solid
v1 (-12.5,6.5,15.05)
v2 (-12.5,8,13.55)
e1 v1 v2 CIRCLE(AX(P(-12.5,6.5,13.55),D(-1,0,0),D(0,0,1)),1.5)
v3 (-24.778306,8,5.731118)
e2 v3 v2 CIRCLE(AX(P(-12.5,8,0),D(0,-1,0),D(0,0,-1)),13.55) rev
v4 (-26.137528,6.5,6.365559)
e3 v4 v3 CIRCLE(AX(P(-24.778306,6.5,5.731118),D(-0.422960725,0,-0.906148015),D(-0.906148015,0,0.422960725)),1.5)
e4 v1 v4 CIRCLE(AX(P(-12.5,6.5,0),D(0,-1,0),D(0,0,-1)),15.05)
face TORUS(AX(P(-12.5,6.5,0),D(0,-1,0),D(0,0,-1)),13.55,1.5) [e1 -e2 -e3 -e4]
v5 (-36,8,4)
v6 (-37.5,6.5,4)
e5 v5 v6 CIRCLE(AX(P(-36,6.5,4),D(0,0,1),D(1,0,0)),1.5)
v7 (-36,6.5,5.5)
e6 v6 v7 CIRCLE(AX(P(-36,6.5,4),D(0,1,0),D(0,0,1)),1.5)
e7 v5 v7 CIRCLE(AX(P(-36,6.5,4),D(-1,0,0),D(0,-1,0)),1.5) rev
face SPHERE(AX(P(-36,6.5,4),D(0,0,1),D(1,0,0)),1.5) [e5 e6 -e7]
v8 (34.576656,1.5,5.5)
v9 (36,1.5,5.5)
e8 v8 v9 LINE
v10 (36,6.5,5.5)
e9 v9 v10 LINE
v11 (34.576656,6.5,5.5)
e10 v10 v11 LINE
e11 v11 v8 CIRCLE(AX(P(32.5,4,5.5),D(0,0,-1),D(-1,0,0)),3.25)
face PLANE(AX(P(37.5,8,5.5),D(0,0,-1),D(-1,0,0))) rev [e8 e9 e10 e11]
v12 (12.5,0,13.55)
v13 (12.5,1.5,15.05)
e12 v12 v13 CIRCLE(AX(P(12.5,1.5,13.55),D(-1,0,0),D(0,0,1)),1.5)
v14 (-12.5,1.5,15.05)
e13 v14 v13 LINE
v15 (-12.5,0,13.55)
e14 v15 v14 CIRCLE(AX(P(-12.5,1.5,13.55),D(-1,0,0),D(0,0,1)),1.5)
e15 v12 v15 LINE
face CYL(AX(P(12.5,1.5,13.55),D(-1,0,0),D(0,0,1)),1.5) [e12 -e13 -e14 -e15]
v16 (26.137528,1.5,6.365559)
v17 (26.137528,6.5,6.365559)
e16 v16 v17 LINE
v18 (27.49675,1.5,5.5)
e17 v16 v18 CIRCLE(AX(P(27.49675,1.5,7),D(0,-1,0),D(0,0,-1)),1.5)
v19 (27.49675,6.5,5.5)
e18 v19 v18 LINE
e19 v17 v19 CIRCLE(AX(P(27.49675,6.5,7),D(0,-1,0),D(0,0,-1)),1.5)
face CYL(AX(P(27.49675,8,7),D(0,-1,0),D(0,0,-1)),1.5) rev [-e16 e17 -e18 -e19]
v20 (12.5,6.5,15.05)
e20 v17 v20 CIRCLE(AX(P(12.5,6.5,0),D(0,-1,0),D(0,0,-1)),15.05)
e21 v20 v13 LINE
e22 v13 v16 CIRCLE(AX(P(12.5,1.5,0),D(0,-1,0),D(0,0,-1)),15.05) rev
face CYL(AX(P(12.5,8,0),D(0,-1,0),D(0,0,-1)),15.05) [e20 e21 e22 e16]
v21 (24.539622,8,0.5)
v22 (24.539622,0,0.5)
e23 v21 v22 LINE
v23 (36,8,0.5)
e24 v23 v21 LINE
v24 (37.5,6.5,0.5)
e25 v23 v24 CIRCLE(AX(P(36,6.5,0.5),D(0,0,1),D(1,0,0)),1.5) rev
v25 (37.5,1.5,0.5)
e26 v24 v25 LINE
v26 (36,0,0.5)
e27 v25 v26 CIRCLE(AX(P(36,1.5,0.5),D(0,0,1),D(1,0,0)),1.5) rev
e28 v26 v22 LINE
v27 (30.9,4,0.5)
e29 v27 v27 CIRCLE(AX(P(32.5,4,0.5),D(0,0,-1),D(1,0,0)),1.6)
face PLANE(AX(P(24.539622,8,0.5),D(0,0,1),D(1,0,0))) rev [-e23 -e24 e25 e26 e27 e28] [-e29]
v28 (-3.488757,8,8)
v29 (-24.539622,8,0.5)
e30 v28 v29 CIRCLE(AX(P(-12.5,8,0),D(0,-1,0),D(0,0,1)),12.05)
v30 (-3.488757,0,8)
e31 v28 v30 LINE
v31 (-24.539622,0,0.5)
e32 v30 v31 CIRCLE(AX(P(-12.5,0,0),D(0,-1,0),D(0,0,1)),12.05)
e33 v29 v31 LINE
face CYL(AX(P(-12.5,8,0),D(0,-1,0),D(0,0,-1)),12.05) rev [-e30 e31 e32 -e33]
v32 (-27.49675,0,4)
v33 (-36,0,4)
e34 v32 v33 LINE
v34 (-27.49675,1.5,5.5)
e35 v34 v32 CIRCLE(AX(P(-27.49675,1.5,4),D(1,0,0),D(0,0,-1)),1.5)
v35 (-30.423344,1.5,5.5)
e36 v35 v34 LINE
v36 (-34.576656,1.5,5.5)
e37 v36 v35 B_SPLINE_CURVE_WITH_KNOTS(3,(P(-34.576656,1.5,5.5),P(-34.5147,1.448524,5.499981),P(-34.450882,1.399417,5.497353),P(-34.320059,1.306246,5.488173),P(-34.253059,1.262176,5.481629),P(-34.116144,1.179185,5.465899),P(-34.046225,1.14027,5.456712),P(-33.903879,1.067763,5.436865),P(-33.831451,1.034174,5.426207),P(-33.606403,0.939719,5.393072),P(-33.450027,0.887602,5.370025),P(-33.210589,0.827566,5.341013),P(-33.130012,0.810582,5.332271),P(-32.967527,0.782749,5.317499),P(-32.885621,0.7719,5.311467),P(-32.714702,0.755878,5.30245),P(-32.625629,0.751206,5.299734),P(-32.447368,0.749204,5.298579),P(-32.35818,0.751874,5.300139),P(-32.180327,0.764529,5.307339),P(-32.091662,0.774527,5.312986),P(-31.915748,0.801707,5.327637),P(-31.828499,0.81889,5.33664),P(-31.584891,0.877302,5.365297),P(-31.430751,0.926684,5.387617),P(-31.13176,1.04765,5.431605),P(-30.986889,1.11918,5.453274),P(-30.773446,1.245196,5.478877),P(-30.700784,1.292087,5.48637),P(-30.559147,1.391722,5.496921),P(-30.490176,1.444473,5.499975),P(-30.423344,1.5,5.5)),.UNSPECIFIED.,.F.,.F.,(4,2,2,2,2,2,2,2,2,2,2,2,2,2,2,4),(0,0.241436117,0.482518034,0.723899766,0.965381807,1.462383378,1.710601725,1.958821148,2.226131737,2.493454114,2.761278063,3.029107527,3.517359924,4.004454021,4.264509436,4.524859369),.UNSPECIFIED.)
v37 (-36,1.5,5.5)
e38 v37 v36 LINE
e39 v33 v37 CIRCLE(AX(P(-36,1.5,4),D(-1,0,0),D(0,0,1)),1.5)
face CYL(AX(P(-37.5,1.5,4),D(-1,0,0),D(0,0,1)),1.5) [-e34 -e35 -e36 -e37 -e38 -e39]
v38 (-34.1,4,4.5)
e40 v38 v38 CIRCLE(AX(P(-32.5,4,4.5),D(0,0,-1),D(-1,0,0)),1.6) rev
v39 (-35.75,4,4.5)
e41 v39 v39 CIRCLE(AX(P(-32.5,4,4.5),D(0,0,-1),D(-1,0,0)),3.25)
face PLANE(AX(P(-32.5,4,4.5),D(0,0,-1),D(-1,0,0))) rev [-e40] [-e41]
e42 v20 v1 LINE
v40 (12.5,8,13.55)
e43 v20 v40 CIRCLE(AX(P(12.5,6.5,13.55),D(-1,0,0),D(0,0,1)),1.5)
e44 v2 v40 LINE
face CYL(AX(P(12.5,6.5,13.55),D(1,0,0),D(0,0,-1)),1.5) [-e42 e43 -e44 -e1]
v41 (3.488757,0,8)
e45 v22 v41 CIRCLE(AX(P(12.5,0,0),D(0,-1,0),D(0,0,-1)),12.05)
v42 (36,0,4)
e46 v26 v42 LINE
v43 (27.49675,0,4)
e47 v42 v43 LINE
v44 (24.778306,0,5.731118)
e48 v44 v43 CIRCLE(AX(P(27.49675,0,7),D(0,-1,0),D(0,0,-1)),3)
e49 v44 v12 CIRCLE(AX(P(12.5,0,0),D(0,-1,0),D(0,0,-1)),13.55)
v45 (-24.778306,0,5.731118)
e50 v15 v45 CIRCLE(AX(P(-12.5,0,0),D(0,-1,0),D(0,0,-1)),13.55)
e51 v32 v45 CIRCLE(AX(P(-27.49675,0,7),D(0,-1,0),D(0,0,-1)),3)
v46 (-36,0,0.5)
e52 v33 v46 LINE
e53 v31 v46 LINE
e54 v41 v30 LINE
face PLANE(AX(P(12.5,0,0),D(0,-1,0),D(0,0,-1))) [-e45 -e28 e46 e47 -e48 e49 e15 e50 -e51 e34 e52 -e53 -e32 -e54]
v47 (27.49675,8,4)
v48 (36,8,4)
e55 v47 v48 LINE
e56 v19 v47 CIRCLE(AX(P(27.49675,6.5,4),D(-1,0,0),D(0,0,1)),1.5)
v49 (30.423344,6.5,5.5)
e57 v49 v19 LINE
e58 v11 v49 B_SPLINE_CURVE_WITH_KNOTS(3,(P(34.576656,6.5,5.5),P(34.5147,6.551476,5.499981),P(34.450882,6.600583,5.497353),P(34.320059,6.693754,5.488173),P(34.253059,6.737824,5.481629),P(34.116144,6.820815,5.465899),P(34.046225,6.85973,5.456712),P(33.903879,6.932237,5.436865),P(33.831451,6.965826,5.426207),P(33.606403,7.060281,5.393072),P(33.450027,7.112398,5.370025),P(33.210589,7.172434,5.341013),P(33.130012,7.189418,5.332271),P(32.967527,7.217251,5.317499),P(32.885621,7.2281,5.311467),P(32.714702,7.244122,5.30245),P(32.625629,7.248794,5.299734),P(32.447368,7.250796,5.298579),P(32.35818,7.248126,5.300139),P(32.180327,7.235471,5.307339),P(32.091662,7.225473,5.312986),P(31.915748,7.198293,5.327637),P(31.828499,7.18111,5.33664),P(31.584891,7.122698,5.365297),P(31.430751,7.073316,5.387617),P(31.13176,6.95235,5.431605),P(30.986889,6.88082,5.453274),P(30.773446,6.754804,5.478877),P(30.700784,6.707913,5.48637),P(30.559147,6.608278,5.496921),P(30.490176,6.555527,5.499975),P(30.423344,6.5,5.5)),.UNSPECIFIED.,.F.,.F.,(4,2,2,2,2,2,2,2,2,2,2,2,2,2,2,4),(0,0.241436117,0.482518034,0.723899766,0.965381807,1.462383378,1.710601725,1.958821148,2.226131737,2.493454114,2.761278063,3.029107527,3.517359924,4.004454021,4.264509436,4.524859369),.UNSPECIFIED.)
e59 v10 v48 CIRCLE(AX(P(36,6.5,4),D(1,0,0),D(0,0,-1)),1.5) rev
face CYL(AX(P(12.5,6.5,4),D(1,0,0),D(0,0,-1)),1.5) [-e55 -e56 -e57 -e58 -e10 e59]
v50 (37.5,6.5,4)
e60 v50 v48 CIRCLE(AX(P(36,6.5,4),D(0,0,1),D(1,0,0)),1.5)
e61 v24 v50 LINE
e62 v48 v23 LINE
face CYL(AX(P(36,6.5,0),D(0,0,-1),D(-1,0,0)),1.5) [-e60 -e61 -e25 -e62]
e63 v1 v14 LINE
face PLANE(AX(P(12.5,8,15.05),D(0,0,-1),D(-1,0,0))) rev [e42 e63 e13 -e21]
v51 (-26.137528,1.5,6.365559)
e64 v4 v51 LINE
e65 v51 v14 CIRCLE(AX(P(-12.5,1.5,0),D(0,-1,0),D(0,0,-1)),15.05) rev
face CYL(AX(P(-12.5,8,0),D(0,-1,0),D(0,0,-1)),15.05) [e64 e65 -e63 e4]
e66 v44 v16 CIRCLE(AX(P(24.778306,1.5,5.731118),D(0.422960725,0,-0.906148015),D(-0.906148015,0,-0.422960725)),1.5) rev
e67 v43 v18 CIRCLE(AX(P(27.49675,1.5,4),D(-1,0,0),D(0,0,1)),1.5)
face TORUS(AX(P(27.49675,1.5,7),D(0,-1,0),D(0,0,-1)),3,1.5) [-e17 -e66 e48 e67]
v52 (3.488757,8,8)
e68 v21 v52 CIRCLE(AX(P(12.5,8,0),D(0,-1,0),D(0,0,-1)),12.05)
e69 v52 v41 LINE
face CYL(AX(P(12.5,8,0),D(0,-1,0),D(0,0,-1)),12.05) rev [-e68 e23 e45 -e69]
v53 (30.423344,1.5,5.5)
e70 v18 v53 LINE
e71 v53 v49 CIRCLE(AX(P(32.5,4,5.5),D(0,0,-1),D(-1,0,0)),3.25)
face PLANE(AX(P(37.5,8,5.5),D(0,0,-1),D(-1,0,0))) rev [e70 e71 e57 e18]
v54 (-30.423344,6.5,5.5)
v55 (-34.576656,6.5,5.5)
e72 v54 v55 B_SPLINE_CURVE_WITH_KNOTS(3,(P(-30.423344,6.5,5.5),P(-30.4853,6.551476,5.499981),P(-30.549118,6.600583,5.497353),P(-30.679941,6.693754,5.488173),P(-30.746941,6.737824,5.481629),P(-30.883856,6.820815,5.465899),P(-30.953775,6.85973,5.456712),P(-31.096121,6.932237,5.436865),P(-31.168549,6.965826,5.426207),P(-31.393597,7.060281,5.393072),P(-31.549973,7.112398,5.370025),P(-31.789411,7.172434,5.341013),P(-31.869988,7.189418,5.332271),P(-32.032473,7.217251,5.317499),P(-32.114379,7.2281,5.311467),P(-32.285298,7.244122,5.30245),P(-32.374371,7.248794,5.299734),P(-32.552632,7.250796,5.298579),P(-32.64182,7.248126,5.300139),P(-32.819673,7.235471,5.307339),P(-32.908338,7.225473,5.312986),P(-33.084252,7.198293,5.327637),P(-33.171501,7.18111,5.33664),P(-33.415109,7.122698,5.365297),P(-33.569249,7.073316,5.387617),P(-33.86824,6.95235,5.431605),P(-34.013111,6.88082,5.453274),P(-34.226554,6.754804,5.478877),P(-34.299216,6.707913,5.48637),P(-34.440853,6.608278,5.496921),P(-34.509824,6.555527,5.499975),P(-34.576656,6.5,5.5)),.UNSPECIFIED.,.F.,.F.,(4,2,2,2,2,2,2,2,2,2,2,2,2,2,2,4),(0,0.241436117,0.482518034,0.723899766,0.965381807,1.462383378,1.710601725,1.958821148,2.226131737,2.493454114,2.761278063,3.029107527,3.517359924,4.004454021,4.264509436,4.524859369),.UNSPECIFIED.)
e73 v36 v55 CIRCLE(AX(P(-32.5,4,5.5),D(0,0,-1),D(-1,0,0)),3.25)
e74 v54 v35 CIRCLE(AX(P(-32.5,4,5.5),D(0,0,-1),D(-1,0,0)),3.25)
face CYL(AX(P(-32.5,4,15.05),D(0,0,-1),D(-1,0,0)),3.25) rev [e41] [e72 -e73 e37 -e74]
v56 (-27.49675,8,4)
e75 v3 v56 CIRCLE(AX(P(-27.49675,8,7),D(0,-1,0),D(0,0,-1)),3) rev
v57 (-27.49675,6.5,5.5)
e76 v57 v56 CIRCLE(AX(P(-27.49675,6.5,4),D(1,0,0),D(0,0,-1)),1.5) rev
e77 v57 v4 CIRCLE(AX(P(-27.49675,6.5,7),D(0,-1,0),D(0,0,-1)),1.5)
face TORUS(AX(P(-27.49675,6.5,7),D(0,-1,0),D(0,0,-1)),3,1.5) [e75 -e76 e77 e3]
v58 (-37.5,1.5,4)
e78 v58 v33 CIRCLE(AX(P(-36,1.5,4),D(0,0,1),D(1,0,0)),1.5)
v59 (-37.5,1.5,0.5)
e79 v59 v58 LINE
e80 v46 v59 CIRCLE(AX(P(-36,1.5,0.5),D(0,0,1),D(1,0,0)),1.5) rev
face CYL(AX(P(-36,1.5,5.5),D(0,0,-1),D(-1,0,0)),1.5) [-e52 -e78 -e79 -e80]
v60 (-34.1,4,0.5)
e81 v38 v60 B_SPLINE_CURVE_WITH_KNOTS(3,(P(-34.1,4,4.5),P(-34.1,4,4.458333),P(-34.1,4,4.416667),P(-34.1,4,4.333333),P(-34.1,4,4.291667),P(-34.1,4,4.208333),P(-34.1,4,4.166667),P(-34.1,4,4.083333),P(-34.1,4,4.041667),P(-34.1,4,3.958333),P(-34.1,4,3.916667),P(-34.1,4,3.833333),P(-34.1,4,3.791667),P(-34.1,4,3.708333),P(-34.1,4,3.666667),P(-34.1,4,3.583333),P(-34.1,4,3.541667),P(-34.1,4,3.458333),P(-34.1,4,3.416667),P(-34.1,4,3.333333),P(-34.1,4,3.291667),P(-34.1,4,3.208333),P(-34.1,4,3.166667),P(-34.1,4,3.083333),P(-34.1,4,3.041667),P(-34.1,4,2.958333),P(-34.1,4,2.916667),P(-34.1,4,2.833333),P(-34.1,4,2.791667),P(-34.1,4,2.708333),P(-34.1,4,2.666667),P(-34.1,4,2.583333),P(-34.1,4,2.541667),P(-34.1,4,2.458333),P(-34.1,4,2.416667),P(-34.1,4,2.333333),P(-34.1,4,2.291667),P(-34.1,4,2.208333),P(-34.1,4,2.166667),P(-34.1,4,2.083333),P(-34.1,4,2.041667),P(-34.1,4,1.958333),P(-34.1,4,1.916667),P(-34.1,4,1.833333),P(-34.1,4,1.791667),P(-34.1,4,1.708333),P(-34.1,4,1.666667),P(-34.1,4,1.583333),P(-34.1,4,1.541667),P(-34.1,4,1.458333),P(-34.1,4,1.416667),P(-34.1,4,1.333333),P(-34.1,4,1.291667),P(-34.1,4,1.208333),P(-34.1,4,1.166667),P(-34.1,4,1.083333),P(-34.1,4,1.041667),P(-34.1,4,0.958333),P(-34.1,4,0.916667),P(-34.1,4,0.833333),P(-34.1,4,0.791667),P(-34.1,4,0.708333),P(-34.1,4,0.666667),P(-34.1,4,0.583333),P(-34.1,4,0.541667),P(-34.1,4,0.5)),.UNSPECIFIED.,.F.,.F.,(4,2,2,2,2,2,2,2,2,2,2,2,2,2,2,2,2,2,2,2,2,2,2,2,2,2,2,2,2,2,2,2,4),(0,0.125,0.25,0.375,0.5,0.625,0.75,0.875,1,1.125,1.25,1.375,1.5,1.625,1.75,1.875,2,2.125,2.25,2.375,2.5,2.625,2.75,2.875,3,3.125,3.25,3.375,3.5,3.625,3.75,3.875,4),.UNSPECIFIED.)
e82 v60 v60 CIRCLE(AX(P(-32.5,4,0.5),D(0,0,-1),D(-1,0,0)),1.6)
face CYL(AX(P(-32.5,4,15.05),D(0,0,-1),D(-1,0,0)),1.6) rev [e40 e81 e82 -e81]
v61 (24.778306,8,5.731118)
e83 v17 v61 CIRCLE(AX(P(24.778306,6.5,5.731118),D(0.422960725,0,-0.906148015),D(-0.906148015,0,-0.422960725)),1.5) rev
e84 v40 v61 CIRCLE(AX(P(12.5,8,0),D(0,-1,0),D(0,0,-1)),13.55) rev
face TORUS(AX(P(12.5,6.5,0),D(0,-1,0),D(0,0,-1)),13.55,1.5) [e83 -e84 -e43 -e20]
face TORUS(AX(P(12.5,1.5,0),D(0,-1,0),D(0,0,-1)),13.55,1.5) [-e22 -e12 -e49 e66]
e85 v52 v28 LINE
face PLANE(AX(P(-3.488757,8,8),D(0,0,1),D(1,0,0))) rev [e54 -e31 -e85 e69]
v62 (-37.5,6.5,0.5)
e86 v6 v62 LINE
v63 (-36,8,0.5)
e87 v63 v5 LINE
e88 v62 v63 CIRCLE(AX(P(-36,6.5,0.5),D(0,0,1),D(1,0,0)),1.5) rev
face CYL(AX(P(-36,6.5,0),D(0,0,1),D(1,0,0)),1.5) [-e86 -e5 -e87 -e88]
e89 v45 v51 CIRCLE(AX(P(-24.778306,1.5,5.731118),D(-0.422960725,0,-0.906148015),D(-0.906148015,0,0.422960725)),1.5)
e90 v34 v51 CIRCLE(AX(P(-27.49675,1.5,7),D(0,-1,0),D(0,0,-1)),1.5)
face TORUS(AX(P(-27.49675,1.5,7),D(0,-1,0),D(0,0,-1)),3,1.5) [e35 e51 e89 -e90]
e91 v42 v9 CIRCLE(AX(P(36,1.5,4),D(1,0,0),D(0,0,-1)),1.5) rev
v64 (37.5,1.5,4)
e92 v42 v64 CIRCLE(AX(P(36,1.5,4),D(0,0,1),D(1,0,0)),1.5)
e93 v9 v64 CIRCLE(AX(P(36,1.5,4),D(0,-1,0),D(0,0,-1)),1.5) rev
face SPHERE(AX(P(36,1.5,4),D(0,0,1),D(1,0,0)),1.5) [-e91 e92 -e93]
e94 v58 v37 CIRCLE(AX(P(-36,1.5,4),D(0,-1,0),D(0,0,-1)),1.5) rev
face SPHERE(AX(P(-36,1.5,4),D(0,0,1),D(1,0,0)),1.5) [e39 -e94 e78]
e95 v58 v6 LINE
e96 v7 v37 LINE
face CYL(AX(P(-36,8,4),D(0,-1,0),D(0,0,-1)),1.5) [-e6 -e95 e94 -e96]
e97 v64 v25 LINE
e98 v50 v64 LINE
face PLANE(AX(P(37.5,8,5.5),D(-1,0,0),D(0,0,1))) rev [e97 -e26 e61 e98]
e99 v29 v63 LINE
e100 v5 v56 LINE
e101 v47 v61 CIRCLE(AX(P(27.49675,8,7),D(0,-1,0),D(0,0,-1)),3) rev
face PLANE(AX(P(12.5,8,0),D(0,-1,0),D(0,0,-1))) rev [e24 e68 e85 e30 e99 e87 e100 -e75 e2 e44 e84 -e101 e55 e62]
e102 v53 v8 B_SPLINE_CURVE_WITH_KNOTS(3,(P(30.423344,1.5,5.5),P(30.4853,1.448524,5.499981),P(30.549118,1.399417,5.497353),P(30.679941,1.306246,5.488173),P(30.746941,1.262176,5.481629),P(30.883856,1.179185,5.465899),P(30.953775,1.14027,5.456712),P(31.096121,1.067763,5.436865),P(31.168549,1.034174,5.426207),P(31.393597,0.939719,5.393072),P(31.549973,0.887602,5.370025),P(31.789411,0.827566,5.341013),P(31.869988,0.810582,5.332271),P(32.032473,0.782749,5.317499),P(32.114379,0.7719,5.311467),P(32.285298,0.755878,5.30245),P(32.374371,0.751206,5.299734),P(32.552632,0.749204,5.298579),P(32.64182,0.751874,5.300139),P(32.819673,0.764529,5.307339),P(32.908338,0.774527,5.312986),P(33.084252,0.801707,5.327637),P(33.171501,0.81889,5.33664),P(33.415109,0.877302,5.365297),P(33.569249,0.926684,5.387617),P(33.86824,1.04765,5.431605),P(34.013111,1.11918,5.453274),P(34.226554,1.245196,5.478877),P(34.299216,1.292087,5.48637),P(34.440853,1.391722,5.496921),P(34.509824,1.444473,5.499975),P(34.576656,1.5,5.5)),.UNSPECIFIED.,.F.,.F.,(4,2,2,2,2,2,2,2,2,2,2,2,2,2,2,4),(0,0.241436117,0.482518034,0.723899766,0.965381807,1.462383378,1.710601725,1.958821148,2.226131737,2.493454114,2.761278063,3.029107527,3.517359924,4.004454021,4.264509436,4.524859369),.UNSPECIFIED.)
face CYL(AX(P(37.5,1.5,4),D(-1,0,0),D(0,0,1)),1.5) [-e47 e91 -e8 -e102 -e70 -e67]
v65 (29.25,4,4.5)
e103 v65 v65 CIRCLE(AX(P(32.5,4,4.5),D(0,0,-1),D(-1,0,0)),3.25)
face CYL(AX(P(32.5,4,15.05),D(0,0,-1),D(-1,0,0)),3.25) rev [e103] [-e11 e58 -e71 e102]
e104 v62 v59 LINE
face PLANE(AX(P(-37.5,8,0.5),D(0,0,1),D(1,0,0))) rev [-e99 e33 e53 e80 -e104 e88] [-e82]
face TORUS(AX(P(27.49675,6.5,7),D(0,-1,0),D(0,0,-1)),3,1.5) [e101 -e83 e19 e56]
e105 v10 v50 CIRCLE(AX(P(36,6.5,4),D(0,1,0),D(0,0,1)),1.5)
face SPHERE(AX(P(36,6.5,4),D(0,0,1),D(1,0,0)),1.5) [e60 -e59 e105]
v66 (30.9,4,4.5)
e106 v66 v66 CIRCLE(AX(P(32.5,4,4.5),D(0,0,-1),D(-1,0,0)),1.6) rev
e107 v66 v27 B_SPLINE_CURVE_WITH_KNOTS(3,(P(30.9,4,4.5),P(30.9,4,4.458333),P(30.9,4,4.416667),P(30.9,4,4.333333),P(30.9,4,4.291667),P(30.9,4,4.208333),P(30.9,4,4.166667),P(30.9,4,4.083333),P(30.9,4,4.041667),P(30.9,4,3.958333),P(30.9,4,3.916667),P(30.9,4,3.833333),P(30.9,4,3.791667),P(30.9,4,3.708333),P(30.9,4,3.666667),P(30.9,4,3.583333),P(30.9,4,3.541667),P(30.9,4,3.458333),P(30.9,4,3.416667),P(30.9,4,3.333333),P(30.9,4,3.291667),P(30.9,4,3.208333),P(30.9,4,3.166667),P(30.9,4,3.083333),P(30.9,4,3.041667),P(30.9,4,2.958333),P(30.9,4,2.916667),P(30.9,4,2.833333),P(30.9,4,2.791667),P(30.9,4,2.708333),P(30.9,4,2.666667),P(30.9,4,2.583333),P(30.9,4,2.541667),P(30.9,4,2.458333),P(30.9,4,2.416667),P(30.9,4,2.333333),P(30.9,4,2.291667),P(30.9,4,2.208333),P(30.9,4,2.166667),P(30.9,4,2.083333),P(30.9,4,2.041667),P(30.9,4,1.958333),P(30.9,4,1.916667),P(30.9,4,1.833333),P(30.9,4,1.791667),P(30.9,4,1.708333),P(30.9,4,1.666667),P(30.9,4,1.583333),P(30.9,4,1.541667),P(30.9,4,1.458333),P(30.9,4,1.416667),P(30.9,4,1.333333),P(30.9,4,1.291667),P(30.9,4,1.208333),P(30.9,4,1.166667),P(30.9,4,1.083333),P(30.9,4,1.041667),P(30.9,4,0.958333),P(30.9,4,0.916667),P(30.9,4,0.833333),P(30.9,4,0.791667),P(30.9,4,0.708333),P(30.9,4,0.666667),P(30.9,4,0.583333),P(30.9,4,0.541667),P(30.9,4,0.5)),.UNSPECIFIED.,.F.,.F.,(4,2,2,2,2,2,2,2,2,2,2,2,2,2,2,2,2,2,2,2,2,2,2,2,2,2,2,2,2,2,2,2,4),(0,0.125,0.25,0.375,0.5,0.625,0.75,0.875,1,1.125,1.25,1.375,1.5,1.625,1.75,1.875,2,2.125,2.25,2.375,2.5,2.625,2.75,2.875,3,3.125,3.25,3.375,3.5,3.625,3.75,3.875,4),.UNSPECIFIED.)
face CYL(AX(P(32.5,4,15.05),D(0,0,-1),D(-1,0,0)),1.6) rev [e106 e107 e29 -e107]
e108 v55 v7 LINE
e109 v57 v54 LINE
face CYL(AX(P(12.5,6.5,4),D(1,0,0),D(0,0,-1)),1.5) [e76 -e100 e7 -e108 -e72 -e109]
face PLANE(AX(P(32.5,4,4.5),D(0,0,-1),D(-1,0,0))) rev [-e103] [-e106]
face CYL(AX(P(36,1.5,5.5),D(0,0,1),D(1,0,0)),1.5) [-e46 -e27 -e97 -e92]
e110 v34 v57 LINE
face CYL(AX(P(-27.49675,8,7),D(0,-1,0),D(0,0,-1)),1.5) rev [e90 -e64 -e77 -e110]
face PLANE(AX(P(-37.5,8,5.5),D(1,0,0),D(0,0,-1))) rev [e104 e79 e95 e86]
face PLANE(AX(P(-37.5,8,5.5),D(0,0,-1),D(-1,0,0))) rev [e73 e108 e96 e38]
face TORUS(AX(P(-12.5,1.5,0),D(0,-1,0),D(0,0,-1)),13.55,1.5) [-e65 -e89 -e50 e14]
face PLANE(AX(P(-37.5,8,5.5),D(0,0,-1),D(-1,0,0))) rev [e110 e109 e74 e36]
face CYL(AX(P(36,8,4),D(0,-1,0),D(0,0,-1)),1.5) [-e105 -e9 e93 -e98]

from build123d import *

# Parameters (mm, degrees)
BOSS_EXTRU_1_DEPTH      = 8
ESQUISSE2_R             = 1.6
ENL_V_MAT_EXTRU_1_DEPTH = 42.011614209
ENL_V_START             = -4
ESQUISSE3_R             = 3.25
ENL_V_MAT_EXTRU_2_DEPTH = 38.011614209
CONG_1_R                = 1.5


with BuildPart() as part:
    # Esquisse1 → Boss.-Extru.1 (new body)
    with BuildSketch(Plane(origin=(0, 0, 0), x_dir=(1, 0, 0), z_dir=(0, 1, 0))):
        with BuildLine():
            Line((-37.5, -0.5), (-24.539622087, -0.5))
            ThreePointArc((-24.539622087, -0.5), (-16.544164933, -11.351089375), (-3.488757022, -8))
            Line((-3.488757022, -8), (3.488757022, -8))
            ThreePointArc((3.488757022, -8), (16.544164933, -11.351089375), (24.539622087, -0.5))
            Line((24.539622087, -0.5), (37.5, -0.5))
            Line((37.5, -0.5), (37.5, -5.5))
            Line((37.5, -5.5), (26.509014955, -5.5))
            ThreePointArc((26.509014955, -5.5), (20.977248964, -12.435382986), (12.5, -15.05))
            Line((12.5, -15.05), (-12.5, -15.05))
            ThreePointArc((-12.5, -15.05), (-20.977248964, -12.435382986), (-26.509014955, -5.5))
            Line((-26.509014955, -5.5), (-37.5, -5.5))
            Line((-37.5, -5.5), (-37.5, -0.5))
        make_face()
    extrude(amount=BOSS_EXTRU_1_DEPTH)

    # Esquisse2 → Enlèv. mat.-Extru.1 (cut, through all)
    with BuildSketch(Plane(origin=(0, 0, 0.5), x_dir=(-1, 0, 0), z_dir=(0, 0, -1))):
        with Locations((32.5, 4)):
            Circle(ESQUISSE2_R)
        with Locations((-32.5, 4)):
            Circle(ESQUISSE2_R)
    extrude(amount=-ENL_V_MAT_EXTRU_1_DEPTH, mode=Mode.SUBTRACT)

    # Esquisse3 → Enlèv. mat.-Extru.2 (cut, through all)
    with BuildSketch(Plane(origin=(0, 0, 0.5), x_dir=(-1, 0, 0), z_dir=(0, 0, -1)).offset(ENL_V_START)):
        with Locations((32.5, 4)):
            Circle(ESQUISSE3_R)
        with Locations((-32.5, 4)):
            Circle(ESQUISSE3_R)
    extrude(amount=-ENL_V_MAT_EXTRU_2_DEPTH, mode=Mode.SUBTRACT)

    # Congé1
    # the kernel refuses this fillet: 1.5 mm, written as the material it adds along each edge
    with BuildSketch(Plane(origin=(26.509014955, 0, 5.5), x_dir=(-0.3943977660181821, 0, 0.9189398251027471), z_dir=(0, 1, 0))) as cong_1_piece_1:
        with BuildLine():
            CenterArc((0.988849381, 1.499265395), CONG_1_R, 203.228419566, 64.978347937)
            Line((-0.389560356, 0.907668746), (0, 0))
            ThreePointArc((0, 0), (0.470955164, 0.007370535), (0.941910328, 0))
        make_face()
    extrude(amount=8)
    with BuildSketch(Plane(origin=(-26.509014955, 0, 5.5), x_dir=(0.3943977660181821, 0, 0.9189398251027471), z_dir=(0, 1, 0))) as cong_1_piece_2:
        with BuildLine():
            CenterArc((0.988849381, -1.499265395), CONG_1_R, 91.793232497, 64.978347937)
            Line((-0.389560356, -0.907668746), (0, 0))
            ThreePointArc((0, 0), (0.470955164, -0.007370535), (0.941910328, 0))
        make_face()
    extrude(amount=8)
    # the kernel refuses this fillet: 1.5 mm, written as the material it takes off along each edge
    with BuildSketch(Plane(origin=(37.5, 0, -3.25), x_dir=(-1, 0, 0), z_dir=(0, 0, 1)), Plane(origin=(-37.5, 0, 9.25), x_dir=(1, 0, 0), z_dir=(0, 0, -1))) as cong_1_2_piece_1:
        with BuildLine():
            CenterArc((CONG_1_R, -CONG_1_R), CONG_1_R, 90, 90)
            Line((0, -CONG_1_R), (0, 0))
            Line((0, 0), (CONG_1_R, 0))
        make_face()
    extrude(amount=12.5, mode=Mode.SUBTRACT)
    with BuildSketch(Plane(origin=(-37.5, 8, 9.25), x_dir=(1, 0, 0), z_dir=(0, 0, -1)), Plane(origin=(37.5, 8, -3.25), x_dir=(-1, 0, 0), z_dir=(0, 0, 1))) as cong_1_2_piece_2:
        with BuildLine():
            CenterArc((CONG_1_R, CONG_1_R), CONG_1_R, 180, 90)
            Line((0, CONG_1_R), (0, 0))
            Line((0, 0), (CONG_1_R, 0))
        make_face()
    extrude(amount=12.5, mode=Mode.SUBTRACT)
    with BuildSketch(Plane(origin=(37.5, -3.75, 5.5), x_dir=(0, 0, -1), z_dir=(0, 1, 0)), Plane(origin=(-37.5, -3.75, 5.5), x_dir=(1, 0, 0), z_dir=(0, 1, 0))) as cong_1_2_piece_3:
        with BuildLine():
            CenterArc((CONG_1_R, CONG_1_R), CONG_1_R, 180, 90)
            Line((0, CONG_1_R), (0, 0))
            Line((0, 0), (CONG_1_R, 0))
        make_face()
    extrude(amount=15.5, mode=Mode.SUBTRACT)
    # the kernel refuses this fillet: 1.5 mm, written as the material it takes off along each edge
    with BuildSketch(Plane(origin=(36, 6.5, 4), x_dir=(0, 0, 1), z_dir=(0, 1, 0))) as cong_1_3_piece_1_section:
        Polygon((0, 0), (CONG_1_R, 0), (CONG_1_R, CONG_1_R), (0, CONG_1_R), align=None)
    cong_1_3_piece_1 = extrude(amount=CONG_1_R, mode=Mode.PRIVATE)
    cong_1_3_piece_1 = cong_1_3_piece_1 - Plane(origin=(36, 6.5, 4), x_dir=(-0.7071067811865475, 0, -0.7071067811865475), z_dir=(0, 1, 0)) * Sphere(CONG_1_R, mode=Mode.PRIVATE)
    add(cong_1_3_piece_1, mode=Mode.SUBTRACT)
    with BuildSketch(Plane(origin=(-36, 6.5, 4), x_dir=(0, 0, 1), z_dir=(0, 1, 0))) as cong_1_3_piece_2_section:
        Polygon((0, 0), (CONG_1_R, 0), (CONG_1_R, -CONG_1_R), (0, -CONG_1_R), align=None)
    cong_1_3_piece_2 = extrude(amount=CONG_1_R, mode=Mode.PRIVATE)
    cong_1_3_piece_2 = cong_1_3_piece_2 - Plane(origin=(-36, 6.5, 4), x_dir=(0.7071067811865475, 0, -0.7071067811865475), z_dir=(0, 1, 0)) * Sphere(CONG_1_R, mode=Mode.PRIVATE)
    add(cong_1_3_piece_2, mode=Mode.SUBTRACT)
    with BuildSketch(Plane(origin=(-36, 1.5, 4), x_dir=(0, 0, 1), z_dir=(0, -1, 0))) as cong_1_3_piece_3_section:
        Polygon((0, 0), (CONG_1_R, 0), (CONG_1_R, CONG_1_R), (0, CONG_1_R), align=None)
    cong_1_3_piece_3 = extrude(amount=CONG_1_R, mode=Mode.PRIVATE)
    cong_1_3_piece_3 = cong_1_3_piece_3 - Plane(origin=(-36, 1.5, 4), x_dir=(0.7071067811865475, 0, -0.7071067811865475), z_dir=(0, -1, 0)) * Sphere(CONG_1_R, mode=Mode.PRIVATE)
    add(cong_1_3_piece_3, mode=Mode.SUBTRACT)
    with BuildSketch(Plane(origin=(36, 1.5, 4), x_dir=(0, 0, 1), z_dir=(0, -1, 0))) as cong_1_3_piece_4_section:
        Polygon((0, 0), (CONG_1_R, 0), (CONG_1_R, -CONG_1_R), (0, -CONG_1_R), align=None)
    cong_1_3_piece_4 = extrude(amount=CONG_1_R, mode=Mode.PRIVATE)
    cong_1_3_piece_4 = cong_1_3_piece_4 - Plane(origin=(36, 1.5, 4), x_dir=(-0.7071067811865475, 0, -0.7071067811865475), z_dir=(0, -1, 0)) * Sphere(CONG_1_R, mode=Mode.PRIVATE)
    add(cong_1_3_piece_4, mode=Mode.SUBTRACT)
    with BuildSketch(Plane(origin=(36, 0, 5.5), x_dir=(0, 0, -1), z_dir=(-1, 0, 0)), Plane(origin=(-27.496749648, 0, 5.5), x_dir=(0, 0, -1), z_dir=(-1, 0, 0))) as cong_1_3_piece_5:
        with BuildLine():
            CenterArc((CONG_1_R, -CONG_1_R), CONG_1_R, 90, 90)
            Line((0, -CONG_1_R), (0, 0))
            Line((0, 0), (CONG_1_R, 0))
        make_face()
    extrude(amount=8.503250352, mode=Mode.SUBTRACT)
    with BuildSketch(Plane(origin=(12.5, 0, 0), x_dir=(0.9061480149752484, 0, 0.4229607250755286), z_dir=(0.4229607250755286, 0, -0.9061480149752484))) as cong_1_3_piece_6:
        with BuildLine():
            CenterArc((15.05 - CONG_1_R, -CONG_1_R), CONG_1_R, 0, 90)
            Line((15.05 - CONG_1_R, 0), (15.05, 0))
            Line((15.05, 0), (15.05, -CONG_1_R))
        make_face()
    revolve(axis=Axis((12.5, 0, 0), (0, -1, 0)), revolution_arc=64.978347937, mode=Mode.SUBTRACT)
    with BuildSketch(Plane(origin=(12.5, 0, 15.05), x_dir=(0, 0, -1), z_dir=(-1, 0, 0)), Plane(origin=(12.5, 8, 15.05), x_dir=(0, -1, 0), z_dir=(-1, 0, 0))) as cong_1_3_piece_7:
        with BuildLine():
            CenterArc((CONG_1_R, -CONG_1_R), CONG_1_R, 90, 90)
            Line((0, -CONG_1_R), (0, 0))
            Line((0, 0), (CONG_1_R, 0))
        make_face()
    extrude(amount=25, mode=Mode.SUBTRACT)
    with BuildSketch(Plane(origin=(-12.5, 0, 0), x_dir=(0, 0, 1), z_dir=(1, 0, 0))) as cong_1_3_piece_8:
        with BuildLine():
            CenterArc((15.05 - CONG_1_R, -CONG_1_R), CONG_1_R, 0, 90)
            Line((15.05, -CONG_1_R), (15.05, 0))
            Line((15.05, 0), (15.05 - CONG_1_R, 0))
        make_face()
    revolve(axis=Axis((-12.5, 0, 0), (0, -1, 0)), revolution_arc=64.978347937, mode=Mode.SUBTRACT)
    with BuildSketch(Plane(origin=(-27.496749648, 8, 5.5), x_dir=(0, 0, -1), z_dir=(-1, 0, 0)), Plane(origin=(36, 8, 5.5), x_dir=(0, 0, -1), z_dir=(-1, 0, 0))) as cong_1_3_piece_9:
        with BuildLine():
            CenterArc((CONG_1_R, CONG_1_R), CONG_1_R, 180, 90)
            Line((0, CONG_1_R), (0, 0))
            Line((0, 0), (CONG_1_R, 0))
        make_face()
    extrude(amount=8.503250352, mode=Mode.SUBTRACT)
    with BuildSketch(Plane(origin=(-12.5, 8, 0), x_dir=(0, 0, 1), z_dir=(1, 0, 0))) as cong_1_3_piece_10:
        with BuildLine():
            CenterArc((15.05 - CONG_1_R, CONG_1_R), CONG_1_R, 270, 90)
            Line((15.05, CONG_1_R), (15.05, 0))
            Line((15.05, 0), (15.05 - CONG_1_R, 0))
        make_face()
    revolve(axis=Axis((-12.5, 8, 0), (0, -1, 0)), revolution_arc=64.978347937, mode=Mode.SUBTRACT)
    with BuildSketch(Plane(origin=(12.5, 8, 0), x_dir=(0.9061480149752484, 0, 0.4229607250755286), z_dir=(0.4229607250755286, 0, -0.9061480149752484))) as cong_1_3_piece_11:
        with BuildLine():
            CenterArc((15.05 - CONG_1_R, CONG_1_R), CONG_1_R, 270, 90)
            Line((15.05 - CONG_1_R, 0), (15.05, 0))
            Line((15.05, 0), (15.05, CONG_1_R))
        make_face()
    revolve(axis=Axis((12.5, 8, 0), (0, -1, 0)), revolution_arc=64.978347937, mode=Mode.SUBTRACT)
    with BuildSketch(Plane(origin=(27.496749648, 8, 7), x_dir=(-0.9061480149752484, 0, -0.4229607250755287), z_dir=(-0.4229607250755287, 0, 0.9061480149752484))) as cong_1_3_piece_12:
        with BuildLine():
            CenterArc((1.5 + CONG_1_R, CONG_1_R), CONG_1_R, 180, 90)
            Line((1.5, CONG_1_R), (1.5, 0))
            Line((1.5, 0), (1.5 + CONG_1_R, 0))
        make_face()
    revolve(axis=Axis((27.496749648, 8, 7), (0, -1, 0)), revolution_arc=64.978347937, mode=Mode.SUBTRACT)
    with BuildSketch(Plane(origin=(-27.496749648, 8, 7), x_dir=(0.9061480149752487, 0, -0.42296072507552823), z_dir=(0.42296072507552823, 0, 0.9061480149752487))) as cong_1_3_piece_13:
        with BuildLine():
            CenterArc((1.5 + CONG_1_R, -CONG_1_R), CONG_1_R, 90, 90)
            Line((1.5, -CONG_1_R), (1.5, 0))
            Line((1.5, 0), (1.5 + CONG_1_R, 0))
        make_face()
    revolve(axis=Axis((-27.496749648, 8, 7), (0, 1, 0)), revolution_arc=64.978347937, mode=Mode.SUBTRACT)
    with BuildSketch(Plane(origin=(-27.496749648, 0, 7), x_dir=(0.9061480149752487, 0, -0.42296072507552823), z_dir=(0.42296072507552823, 0, 0.9061480149752487))) as cong_1_3_piece_14:
        with BuildLine():
            CenterArc((1.5 + CONG_1_R, CONG_1_R), CONG_1_R, 180, 90)
            Line((1.5, CONG_1_R), (1.5, 0))
            Line((1.5, 0), (1.5 + CONG_1_R, 0))
        make_face()
    revolve(axis=Axis((-27.496749648, 0, 7), (0, 1, 0)), revolution_arc=64.978347937, mode=Mode.SUBTRACT)
    with BuildSketch(Plane(origin=(27.496749648, 0, 7), x_dir=(-0.9061480149752484, 0, -0.4229607250755287), z_dir=(-0.4229607250755287, 0, 0.9061480149752484))) as cong_1_3_piece_15:
        with BuildLine():
            CenterArc((1.5 + CONG_1_R, -CONG_1_R), CONG_1_R, 90, 90)
            Line((1.5, -CONG_1_R), (1.5, 0))
            Line((1.5, 0), (1.5 + CONG_1_R, 0))
        make_face()
    revolve(axis=Axis((27.496749648, 0, 7), (0, -1, 0)), revolution_arc=64.978347937, mode=Mode.SUBTRACT)


solid = part.part
